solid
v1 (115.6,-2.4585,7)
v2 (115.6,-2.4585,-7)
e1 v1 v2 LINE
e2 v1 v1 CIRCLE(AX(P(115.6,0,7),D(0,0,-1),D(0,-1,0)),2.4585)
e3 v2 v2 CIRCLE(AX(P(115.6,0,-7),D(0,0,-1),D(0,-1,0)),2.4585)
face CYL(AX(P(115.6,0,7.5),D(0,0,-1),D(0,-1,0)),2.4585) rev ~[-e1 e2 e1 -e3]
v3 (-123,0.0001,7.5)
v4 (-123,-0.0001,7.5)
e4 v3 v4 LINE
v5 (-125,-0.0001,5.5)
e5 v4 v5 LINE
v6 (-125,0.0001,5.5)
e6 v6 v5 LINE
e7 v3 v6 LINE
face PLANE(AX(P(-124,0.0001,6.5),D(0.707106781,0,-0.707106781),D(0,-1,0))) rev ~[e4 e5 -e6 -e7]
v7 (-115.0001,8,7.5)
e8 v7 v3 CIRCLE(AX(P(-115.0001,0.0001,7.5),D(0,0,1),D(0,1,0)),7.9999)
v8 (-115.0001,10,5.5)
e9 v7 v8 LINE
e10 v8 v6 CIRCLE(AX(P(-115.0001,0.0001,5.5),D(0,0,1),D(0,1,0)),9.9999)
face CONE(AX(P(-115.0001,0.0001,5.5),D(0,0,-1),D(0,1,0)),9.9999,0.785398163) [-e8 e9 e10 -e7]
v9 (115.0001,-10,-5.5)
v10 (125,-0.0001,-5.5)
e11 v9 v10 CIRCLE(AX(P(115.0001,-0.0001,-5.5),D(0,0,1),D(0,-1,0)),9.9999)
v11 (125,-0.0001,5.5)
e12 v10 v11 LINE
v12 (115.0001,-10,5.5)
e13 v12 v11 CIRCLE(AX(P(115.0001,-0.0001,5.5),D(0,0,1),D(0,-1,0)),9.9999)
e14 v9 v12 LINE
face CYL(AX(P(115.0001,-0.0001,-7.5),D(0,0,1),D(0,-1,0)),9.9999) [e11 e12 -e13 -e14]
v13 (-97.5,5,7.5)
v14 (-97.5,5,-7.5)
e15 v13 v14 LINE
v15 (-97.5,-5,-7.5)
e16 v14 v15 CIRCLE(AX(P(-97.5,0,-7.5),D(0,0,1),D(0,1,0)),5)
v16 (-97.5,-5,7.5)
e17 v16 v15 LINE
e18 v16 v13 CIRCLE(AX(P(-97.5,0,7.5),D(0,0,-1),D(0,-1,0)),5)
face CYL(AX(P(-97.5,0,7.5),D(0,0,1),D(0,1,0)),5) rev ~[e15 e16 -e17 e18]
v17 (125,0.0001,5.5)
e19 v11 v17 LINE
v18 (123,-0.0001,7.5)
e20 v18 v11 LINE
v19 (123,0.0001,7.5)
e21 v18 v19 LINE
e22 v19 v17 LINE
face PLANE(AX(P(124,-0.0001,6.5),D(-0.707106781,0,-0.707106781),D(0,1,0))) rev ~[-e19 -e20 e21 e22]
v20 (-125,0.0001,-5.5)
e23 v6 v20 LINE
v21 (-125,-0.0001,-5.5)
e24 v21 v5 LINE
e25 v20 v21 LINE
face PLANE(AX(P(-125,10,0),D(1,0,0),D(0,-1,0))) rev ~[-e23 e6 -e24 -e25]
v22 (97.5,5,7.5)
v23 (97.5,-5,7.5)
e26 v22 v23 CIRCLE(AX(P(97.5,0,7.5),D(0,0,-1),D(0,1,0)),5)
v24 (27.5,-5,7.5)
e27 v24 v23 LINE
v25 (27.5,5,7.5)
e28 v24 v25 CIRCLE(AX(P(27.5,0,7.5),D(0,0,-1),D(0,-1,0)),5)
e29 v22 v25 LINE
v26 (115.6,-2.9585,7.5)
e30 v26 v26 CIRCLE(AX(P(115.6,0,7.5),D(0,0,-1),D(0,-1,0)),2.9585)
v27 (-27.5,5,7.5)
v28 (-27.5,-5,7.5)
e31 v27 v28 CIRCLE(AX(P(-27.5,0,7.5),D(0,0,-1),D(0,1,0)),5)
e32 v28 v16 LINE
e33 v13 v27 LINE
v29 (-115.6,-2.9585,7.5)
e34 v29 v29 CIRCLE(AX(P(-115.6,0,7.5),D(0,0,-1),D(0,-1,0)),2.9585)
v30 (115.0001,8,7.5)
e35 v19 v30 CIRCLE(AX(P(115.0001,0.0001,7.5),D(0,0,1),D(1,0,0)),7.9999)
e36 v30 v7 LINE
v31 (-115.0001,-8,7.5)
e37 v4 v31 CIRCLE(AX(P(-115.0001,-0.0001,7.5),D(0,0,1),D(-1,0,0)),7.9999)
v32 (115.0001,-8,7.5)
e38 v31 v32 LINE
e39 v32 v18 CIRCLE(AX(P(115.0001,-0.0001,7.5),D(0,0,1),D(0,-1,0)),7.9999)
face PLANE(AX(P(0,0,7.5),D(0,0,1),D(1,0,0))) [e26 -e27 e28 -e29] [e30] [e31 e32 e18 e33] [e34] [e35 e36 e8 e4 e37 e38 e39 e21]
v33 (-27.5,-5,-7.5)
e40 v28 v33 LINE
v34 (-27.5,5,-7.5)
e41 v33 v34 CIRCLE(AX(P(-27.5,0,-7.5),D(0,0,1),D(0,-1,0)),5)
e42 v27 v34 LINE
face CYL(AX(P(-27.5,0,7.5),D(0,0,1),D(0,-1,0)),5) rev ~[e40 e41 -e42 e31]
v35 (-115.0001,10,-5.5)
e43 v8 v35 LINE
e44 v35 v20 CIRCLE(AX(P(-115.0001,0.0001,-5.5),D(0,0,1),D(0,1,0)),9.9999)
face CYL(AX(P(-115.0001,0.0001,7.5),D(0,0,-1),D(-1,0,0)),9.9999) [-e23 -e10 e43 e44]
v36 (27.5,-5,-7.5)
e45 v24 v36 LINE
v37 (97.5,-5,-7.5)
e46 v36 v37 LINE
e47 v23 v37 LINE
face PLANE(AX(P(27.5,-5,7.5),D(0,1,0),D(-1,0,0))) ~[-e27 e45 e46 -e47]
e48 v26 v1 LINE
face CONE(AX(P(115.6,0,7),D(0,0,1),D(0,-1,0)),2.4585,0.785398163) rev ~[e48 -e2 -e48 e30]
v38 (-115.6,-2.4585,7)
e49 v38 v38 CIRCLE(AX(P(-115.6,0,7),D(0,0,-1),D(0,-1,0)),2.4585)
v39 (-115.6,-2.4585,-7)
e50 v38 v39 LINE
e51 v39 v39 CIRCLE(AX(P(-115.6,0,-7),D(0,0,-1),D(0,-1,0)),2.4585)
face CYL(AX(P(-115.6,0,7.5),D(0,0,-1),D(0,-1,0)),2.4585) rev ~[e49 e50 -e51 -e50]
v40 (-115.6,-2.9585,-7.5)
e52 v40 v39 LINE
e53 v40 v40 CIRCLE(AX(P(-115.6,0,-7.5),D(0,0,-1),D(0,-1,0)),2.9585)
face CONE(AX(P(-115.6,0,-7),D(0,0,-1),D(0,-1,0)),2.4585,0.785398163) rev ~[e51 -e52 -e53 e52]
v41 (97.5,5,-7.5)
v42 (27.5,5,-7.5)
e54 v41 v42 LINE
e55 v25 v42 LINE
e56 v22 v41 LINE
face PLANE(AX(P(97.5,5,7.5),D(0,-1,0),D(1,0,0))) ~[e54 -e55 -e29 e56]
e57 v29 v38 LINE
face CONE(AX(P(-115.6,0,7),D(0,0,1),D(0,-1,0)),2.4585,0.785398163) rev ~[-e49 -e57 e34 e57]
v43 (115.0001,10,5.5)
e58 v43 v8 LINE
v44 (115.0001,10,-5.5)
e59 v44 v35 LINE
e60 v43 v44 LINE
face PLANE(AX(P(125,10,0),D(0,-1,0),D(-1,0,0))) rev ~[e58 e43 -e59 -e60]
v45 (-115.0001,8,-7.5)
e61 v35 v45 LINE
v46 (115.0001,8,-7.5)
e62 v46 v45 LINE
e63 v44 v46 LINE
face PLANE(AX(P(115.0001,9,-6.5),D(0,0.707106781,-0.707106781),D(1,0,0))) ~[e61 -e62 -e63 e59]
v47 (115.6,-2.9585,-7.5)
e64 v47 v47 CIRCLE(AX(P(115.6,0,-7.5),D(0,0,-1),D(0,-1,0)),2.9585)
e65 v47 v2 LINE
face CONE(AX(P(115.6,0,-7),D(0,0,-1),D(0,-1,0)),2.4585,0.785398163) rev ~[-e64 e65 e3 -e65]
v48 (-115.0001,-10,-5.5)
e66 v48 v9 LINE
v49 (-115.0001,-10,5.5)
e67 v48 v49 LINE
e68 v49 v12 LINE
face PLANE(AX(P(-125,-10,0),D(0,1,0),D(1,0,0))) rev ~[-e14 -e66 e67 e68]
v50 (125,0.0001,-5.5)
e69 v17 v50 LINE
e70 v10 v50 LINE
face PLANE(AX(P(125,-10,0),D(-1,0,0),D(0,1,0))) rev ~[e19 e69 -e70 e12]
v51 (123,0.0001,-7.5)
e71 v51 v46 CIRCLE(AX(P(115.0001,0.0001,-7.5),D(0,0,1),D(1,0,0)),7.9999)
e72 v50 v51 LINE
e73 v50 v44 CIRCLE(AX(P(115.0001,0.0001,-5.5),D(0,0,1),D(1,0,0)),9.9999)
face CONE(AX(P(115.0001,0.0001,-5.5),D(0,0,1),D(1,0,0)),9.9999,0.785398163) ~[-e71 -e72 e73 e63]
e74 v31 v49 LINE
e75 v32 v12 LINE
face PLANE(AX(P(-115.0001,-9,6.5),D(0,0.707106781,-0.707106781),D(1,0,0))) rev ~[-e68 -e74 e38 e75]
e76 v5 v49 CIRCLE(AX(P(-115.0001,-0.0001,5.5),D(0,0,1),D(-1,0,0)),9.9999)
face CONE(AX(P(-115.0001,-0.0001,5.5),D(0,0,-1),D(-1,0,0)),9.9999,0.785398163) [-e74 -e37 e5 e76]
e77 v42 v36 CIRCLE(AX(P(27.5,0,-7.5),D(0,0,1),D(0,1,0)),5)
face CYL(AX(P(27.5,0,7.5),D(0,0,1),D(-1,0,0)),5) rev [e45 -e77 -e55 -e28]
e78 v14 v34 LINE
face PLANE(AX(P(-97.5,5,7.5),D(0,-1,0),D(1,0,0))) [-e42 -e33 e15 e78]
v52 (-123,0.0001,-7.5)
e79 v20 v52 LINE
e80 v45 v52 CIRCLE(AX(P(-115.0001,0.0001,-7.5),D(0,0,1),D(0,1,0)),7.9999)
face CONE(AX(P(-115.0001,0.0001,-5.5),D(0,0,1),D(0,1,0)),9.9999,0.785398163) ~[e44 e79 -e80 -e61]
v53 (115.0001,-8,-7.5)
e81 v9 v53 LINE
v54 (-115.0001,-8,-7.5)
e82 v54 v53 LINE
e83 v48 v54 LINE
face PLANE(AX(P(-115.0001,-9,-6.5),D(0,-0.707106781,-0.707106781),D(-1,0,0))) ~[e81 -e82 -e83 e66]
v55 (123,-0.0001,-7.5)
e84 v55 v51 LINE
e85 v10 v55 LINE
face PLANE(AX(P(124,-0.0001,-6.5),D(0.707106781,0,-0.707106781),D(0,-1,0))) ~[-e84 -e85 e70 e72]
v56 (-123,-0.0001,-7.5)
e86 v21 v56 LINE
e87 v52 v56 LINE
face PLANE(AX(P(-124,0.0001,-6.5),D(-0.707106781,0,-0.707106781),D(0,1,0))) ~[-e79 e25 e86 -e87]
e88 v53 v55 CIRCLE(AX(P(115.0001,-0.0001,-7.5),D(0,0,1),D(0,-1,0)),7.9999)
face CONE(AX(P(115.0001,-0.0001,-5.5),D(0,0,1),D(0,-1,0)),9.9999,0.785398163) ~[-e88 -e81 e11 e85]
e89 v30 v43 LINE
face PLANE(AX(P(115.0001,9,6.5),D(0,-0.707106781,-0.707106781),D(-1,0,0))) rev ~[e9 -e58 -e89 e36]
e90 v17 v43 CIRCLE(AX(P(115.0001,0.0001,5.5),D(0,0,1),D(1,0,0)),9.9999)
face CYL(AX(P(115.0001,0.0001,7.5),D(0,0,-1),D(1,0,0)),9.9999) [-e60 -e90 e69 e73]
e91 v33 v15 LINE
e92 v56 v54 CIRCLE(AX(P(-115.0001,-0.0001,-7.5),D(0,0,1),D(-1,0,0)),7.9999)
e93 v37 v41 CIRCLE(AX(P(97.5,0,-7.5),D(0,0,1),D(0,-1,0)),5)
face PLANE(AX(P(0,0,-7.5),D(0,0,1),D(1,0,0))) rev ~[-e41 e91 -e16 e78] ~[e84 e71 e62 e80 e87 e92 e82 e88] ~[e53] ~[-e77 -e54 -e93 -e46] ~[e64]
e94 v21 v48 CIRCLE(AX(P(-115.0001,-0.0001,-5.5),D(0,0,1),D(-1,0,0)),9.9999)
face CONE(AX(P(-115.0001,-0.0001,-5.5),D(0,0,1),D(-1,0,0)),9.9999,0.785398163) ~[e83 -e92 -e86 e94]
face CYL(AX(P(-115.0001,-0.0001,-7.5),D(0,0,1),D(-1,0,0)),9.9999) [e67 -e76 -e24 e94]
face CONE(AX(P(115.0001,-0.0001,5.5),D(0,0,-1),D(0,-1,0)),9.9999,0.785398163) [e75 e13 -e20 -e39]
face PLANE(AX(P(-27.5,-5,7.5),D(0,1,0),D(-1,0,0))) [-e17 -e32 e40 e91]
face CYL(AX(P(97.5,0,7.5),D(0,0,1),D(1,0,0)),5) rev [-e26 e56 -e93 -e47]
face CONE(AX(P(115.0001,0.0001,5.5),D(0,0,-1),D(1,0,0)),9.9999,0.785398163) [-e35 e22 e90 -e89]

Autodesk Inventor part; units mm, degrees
ref_plane "YZ Plane" through (0, 0, 0) normal (1, 0, 0) x (0, 1, 0)
ref_plane "XZ Plane" through (0, 0, 0) normal (0, 1, 0) x (-1, 0, 0)
ref_plane "XY Plane" through (0, 0, 0) normal (0, 0, 1) x (1, 0, 0)
sketch "Skizze1" plane through (0, 0, 0) normal (0, 0, 1) x (1, 0, 0)
  line L0 (-175, 0) -> (175, 0) construction
  line L1 (0, 14) -> (0, -14) construction
  line L2 (-125, -10) -> (125, -10)
  line L3 (125, -10) -> (125, 10)
  line L4 (125, 10) -> (-125, 10)
  line L5 (-125, 10) -> (-125, -10)
  line L6 (-125, -10) -> (125, 10) construction
  line L7 (125, -10) -> (-125, 10) construction
  point P0 (0, 0)
  dimension "d0" = 250
  dimension "d1" = 20
extrude "Grundkörper" add sketch "Skizze1" along normal mid plane 15
sketch "Skizze2" plane through (0, 0, 7.5) normal (0, 0, 1) x (1, 0, 0)
  line L0 (0, 14) -> (0, -14) construction
  point P0 (0, 0)
  point P1 (-115.6, 0)
  point P2 (115.6, 0)
  dimension "d4" = 231.2
hole "M6" at (-115.6, 0, 7.5) at (115.6, 0, 7.5) direction (0, 0, -1) diameter 4.917 end through all thread size "M6x1" class "6H" standard "ISO Metric profile"
sketch "Skizze3" plane through (0, 0, 7.5) normal (0, 0, 1) x (1, 0, 0)
  line L0 (0, 14) -> (0, -14) construction
  line L1 (-97.5, 5) -> (-27.5, 5)
  line L2 (-22.5, 0) -> (-22.5, 0)
  line L3 (-27.5, -5) -> (-97.5, -5)
  line L4 (-102.5, 0) -> (-102.5, 0)
  line L5 (-212.2426, 0) -> (181.2071, 0) construction
  line L6 (125, 10) -> (-125, 10) projected
  line L7 (0, 10) -> (-125, 10)
  line L8 (-62.5, 10) -> (-62.5, -10) construction
  line L9 (-125, -10) -> (125, -10) construction
  arc A0 (-102.5, 0) -> (-97.5, -5) centre (-97.5, 0) ccw
  arc A1 (-97.5, 5) -> (-102.5, 0) centre (-97.5, 0) ccw
  arc A2 (-22.5, 0) -> (-27.5, 5) centre (-27.5, 0) ccw
  arc A3 (-27.5, -5) -> (-22.5, 0) centre (-27.5, 0) ccw
  point P0 (0, 0)
  point P1 (-102.5, 5)
  point P2 (-22.5, 5)
  dimension "d16" = 10
  dimension "d17" = 80
  dimension "d18" = 5
extrude "Ausschnitt_Gewichtsreduktion" cut sketch "Skizze3" against normal through all
mirror "Spiegeln_Ausschnitt_Gewichtsreduktion" about plane through (0, 0, 0) normal (1, 0, 0) of "Ausschnitt_Gewichtsreduktion"
chamfer "Fase_M6_Gewinde" distance 0.5 angle 45 4 edges at (-115.6, 2.4585, -7.5) (-115.6, 2.4585, 7.5) (115.6, 2.4585, 7.5) (115.6, 2.4585, -7.5)
fillet "Abrundung" radius 10 4 edges at (-125, 10, 0) (-125, -10, 0) (125, -10, 0) (125, 10, 0)
chamfer "Fase2" distance 2 angle 45 8 edges at (0, -10, 7.5) (122.0711, -7.0711, 7.5) (0, 10, 7.5) (-122.0711, 7.0711, 7.5) (0, -10, -7.5) (-122.0711, 7.0711, -7.5) (0, 10, -7.5) (122.0711, -7.0711, -7.5)
properties part number "200-60-DIFFERENTIAL-BAR-03" material "Aluminium 6061"
